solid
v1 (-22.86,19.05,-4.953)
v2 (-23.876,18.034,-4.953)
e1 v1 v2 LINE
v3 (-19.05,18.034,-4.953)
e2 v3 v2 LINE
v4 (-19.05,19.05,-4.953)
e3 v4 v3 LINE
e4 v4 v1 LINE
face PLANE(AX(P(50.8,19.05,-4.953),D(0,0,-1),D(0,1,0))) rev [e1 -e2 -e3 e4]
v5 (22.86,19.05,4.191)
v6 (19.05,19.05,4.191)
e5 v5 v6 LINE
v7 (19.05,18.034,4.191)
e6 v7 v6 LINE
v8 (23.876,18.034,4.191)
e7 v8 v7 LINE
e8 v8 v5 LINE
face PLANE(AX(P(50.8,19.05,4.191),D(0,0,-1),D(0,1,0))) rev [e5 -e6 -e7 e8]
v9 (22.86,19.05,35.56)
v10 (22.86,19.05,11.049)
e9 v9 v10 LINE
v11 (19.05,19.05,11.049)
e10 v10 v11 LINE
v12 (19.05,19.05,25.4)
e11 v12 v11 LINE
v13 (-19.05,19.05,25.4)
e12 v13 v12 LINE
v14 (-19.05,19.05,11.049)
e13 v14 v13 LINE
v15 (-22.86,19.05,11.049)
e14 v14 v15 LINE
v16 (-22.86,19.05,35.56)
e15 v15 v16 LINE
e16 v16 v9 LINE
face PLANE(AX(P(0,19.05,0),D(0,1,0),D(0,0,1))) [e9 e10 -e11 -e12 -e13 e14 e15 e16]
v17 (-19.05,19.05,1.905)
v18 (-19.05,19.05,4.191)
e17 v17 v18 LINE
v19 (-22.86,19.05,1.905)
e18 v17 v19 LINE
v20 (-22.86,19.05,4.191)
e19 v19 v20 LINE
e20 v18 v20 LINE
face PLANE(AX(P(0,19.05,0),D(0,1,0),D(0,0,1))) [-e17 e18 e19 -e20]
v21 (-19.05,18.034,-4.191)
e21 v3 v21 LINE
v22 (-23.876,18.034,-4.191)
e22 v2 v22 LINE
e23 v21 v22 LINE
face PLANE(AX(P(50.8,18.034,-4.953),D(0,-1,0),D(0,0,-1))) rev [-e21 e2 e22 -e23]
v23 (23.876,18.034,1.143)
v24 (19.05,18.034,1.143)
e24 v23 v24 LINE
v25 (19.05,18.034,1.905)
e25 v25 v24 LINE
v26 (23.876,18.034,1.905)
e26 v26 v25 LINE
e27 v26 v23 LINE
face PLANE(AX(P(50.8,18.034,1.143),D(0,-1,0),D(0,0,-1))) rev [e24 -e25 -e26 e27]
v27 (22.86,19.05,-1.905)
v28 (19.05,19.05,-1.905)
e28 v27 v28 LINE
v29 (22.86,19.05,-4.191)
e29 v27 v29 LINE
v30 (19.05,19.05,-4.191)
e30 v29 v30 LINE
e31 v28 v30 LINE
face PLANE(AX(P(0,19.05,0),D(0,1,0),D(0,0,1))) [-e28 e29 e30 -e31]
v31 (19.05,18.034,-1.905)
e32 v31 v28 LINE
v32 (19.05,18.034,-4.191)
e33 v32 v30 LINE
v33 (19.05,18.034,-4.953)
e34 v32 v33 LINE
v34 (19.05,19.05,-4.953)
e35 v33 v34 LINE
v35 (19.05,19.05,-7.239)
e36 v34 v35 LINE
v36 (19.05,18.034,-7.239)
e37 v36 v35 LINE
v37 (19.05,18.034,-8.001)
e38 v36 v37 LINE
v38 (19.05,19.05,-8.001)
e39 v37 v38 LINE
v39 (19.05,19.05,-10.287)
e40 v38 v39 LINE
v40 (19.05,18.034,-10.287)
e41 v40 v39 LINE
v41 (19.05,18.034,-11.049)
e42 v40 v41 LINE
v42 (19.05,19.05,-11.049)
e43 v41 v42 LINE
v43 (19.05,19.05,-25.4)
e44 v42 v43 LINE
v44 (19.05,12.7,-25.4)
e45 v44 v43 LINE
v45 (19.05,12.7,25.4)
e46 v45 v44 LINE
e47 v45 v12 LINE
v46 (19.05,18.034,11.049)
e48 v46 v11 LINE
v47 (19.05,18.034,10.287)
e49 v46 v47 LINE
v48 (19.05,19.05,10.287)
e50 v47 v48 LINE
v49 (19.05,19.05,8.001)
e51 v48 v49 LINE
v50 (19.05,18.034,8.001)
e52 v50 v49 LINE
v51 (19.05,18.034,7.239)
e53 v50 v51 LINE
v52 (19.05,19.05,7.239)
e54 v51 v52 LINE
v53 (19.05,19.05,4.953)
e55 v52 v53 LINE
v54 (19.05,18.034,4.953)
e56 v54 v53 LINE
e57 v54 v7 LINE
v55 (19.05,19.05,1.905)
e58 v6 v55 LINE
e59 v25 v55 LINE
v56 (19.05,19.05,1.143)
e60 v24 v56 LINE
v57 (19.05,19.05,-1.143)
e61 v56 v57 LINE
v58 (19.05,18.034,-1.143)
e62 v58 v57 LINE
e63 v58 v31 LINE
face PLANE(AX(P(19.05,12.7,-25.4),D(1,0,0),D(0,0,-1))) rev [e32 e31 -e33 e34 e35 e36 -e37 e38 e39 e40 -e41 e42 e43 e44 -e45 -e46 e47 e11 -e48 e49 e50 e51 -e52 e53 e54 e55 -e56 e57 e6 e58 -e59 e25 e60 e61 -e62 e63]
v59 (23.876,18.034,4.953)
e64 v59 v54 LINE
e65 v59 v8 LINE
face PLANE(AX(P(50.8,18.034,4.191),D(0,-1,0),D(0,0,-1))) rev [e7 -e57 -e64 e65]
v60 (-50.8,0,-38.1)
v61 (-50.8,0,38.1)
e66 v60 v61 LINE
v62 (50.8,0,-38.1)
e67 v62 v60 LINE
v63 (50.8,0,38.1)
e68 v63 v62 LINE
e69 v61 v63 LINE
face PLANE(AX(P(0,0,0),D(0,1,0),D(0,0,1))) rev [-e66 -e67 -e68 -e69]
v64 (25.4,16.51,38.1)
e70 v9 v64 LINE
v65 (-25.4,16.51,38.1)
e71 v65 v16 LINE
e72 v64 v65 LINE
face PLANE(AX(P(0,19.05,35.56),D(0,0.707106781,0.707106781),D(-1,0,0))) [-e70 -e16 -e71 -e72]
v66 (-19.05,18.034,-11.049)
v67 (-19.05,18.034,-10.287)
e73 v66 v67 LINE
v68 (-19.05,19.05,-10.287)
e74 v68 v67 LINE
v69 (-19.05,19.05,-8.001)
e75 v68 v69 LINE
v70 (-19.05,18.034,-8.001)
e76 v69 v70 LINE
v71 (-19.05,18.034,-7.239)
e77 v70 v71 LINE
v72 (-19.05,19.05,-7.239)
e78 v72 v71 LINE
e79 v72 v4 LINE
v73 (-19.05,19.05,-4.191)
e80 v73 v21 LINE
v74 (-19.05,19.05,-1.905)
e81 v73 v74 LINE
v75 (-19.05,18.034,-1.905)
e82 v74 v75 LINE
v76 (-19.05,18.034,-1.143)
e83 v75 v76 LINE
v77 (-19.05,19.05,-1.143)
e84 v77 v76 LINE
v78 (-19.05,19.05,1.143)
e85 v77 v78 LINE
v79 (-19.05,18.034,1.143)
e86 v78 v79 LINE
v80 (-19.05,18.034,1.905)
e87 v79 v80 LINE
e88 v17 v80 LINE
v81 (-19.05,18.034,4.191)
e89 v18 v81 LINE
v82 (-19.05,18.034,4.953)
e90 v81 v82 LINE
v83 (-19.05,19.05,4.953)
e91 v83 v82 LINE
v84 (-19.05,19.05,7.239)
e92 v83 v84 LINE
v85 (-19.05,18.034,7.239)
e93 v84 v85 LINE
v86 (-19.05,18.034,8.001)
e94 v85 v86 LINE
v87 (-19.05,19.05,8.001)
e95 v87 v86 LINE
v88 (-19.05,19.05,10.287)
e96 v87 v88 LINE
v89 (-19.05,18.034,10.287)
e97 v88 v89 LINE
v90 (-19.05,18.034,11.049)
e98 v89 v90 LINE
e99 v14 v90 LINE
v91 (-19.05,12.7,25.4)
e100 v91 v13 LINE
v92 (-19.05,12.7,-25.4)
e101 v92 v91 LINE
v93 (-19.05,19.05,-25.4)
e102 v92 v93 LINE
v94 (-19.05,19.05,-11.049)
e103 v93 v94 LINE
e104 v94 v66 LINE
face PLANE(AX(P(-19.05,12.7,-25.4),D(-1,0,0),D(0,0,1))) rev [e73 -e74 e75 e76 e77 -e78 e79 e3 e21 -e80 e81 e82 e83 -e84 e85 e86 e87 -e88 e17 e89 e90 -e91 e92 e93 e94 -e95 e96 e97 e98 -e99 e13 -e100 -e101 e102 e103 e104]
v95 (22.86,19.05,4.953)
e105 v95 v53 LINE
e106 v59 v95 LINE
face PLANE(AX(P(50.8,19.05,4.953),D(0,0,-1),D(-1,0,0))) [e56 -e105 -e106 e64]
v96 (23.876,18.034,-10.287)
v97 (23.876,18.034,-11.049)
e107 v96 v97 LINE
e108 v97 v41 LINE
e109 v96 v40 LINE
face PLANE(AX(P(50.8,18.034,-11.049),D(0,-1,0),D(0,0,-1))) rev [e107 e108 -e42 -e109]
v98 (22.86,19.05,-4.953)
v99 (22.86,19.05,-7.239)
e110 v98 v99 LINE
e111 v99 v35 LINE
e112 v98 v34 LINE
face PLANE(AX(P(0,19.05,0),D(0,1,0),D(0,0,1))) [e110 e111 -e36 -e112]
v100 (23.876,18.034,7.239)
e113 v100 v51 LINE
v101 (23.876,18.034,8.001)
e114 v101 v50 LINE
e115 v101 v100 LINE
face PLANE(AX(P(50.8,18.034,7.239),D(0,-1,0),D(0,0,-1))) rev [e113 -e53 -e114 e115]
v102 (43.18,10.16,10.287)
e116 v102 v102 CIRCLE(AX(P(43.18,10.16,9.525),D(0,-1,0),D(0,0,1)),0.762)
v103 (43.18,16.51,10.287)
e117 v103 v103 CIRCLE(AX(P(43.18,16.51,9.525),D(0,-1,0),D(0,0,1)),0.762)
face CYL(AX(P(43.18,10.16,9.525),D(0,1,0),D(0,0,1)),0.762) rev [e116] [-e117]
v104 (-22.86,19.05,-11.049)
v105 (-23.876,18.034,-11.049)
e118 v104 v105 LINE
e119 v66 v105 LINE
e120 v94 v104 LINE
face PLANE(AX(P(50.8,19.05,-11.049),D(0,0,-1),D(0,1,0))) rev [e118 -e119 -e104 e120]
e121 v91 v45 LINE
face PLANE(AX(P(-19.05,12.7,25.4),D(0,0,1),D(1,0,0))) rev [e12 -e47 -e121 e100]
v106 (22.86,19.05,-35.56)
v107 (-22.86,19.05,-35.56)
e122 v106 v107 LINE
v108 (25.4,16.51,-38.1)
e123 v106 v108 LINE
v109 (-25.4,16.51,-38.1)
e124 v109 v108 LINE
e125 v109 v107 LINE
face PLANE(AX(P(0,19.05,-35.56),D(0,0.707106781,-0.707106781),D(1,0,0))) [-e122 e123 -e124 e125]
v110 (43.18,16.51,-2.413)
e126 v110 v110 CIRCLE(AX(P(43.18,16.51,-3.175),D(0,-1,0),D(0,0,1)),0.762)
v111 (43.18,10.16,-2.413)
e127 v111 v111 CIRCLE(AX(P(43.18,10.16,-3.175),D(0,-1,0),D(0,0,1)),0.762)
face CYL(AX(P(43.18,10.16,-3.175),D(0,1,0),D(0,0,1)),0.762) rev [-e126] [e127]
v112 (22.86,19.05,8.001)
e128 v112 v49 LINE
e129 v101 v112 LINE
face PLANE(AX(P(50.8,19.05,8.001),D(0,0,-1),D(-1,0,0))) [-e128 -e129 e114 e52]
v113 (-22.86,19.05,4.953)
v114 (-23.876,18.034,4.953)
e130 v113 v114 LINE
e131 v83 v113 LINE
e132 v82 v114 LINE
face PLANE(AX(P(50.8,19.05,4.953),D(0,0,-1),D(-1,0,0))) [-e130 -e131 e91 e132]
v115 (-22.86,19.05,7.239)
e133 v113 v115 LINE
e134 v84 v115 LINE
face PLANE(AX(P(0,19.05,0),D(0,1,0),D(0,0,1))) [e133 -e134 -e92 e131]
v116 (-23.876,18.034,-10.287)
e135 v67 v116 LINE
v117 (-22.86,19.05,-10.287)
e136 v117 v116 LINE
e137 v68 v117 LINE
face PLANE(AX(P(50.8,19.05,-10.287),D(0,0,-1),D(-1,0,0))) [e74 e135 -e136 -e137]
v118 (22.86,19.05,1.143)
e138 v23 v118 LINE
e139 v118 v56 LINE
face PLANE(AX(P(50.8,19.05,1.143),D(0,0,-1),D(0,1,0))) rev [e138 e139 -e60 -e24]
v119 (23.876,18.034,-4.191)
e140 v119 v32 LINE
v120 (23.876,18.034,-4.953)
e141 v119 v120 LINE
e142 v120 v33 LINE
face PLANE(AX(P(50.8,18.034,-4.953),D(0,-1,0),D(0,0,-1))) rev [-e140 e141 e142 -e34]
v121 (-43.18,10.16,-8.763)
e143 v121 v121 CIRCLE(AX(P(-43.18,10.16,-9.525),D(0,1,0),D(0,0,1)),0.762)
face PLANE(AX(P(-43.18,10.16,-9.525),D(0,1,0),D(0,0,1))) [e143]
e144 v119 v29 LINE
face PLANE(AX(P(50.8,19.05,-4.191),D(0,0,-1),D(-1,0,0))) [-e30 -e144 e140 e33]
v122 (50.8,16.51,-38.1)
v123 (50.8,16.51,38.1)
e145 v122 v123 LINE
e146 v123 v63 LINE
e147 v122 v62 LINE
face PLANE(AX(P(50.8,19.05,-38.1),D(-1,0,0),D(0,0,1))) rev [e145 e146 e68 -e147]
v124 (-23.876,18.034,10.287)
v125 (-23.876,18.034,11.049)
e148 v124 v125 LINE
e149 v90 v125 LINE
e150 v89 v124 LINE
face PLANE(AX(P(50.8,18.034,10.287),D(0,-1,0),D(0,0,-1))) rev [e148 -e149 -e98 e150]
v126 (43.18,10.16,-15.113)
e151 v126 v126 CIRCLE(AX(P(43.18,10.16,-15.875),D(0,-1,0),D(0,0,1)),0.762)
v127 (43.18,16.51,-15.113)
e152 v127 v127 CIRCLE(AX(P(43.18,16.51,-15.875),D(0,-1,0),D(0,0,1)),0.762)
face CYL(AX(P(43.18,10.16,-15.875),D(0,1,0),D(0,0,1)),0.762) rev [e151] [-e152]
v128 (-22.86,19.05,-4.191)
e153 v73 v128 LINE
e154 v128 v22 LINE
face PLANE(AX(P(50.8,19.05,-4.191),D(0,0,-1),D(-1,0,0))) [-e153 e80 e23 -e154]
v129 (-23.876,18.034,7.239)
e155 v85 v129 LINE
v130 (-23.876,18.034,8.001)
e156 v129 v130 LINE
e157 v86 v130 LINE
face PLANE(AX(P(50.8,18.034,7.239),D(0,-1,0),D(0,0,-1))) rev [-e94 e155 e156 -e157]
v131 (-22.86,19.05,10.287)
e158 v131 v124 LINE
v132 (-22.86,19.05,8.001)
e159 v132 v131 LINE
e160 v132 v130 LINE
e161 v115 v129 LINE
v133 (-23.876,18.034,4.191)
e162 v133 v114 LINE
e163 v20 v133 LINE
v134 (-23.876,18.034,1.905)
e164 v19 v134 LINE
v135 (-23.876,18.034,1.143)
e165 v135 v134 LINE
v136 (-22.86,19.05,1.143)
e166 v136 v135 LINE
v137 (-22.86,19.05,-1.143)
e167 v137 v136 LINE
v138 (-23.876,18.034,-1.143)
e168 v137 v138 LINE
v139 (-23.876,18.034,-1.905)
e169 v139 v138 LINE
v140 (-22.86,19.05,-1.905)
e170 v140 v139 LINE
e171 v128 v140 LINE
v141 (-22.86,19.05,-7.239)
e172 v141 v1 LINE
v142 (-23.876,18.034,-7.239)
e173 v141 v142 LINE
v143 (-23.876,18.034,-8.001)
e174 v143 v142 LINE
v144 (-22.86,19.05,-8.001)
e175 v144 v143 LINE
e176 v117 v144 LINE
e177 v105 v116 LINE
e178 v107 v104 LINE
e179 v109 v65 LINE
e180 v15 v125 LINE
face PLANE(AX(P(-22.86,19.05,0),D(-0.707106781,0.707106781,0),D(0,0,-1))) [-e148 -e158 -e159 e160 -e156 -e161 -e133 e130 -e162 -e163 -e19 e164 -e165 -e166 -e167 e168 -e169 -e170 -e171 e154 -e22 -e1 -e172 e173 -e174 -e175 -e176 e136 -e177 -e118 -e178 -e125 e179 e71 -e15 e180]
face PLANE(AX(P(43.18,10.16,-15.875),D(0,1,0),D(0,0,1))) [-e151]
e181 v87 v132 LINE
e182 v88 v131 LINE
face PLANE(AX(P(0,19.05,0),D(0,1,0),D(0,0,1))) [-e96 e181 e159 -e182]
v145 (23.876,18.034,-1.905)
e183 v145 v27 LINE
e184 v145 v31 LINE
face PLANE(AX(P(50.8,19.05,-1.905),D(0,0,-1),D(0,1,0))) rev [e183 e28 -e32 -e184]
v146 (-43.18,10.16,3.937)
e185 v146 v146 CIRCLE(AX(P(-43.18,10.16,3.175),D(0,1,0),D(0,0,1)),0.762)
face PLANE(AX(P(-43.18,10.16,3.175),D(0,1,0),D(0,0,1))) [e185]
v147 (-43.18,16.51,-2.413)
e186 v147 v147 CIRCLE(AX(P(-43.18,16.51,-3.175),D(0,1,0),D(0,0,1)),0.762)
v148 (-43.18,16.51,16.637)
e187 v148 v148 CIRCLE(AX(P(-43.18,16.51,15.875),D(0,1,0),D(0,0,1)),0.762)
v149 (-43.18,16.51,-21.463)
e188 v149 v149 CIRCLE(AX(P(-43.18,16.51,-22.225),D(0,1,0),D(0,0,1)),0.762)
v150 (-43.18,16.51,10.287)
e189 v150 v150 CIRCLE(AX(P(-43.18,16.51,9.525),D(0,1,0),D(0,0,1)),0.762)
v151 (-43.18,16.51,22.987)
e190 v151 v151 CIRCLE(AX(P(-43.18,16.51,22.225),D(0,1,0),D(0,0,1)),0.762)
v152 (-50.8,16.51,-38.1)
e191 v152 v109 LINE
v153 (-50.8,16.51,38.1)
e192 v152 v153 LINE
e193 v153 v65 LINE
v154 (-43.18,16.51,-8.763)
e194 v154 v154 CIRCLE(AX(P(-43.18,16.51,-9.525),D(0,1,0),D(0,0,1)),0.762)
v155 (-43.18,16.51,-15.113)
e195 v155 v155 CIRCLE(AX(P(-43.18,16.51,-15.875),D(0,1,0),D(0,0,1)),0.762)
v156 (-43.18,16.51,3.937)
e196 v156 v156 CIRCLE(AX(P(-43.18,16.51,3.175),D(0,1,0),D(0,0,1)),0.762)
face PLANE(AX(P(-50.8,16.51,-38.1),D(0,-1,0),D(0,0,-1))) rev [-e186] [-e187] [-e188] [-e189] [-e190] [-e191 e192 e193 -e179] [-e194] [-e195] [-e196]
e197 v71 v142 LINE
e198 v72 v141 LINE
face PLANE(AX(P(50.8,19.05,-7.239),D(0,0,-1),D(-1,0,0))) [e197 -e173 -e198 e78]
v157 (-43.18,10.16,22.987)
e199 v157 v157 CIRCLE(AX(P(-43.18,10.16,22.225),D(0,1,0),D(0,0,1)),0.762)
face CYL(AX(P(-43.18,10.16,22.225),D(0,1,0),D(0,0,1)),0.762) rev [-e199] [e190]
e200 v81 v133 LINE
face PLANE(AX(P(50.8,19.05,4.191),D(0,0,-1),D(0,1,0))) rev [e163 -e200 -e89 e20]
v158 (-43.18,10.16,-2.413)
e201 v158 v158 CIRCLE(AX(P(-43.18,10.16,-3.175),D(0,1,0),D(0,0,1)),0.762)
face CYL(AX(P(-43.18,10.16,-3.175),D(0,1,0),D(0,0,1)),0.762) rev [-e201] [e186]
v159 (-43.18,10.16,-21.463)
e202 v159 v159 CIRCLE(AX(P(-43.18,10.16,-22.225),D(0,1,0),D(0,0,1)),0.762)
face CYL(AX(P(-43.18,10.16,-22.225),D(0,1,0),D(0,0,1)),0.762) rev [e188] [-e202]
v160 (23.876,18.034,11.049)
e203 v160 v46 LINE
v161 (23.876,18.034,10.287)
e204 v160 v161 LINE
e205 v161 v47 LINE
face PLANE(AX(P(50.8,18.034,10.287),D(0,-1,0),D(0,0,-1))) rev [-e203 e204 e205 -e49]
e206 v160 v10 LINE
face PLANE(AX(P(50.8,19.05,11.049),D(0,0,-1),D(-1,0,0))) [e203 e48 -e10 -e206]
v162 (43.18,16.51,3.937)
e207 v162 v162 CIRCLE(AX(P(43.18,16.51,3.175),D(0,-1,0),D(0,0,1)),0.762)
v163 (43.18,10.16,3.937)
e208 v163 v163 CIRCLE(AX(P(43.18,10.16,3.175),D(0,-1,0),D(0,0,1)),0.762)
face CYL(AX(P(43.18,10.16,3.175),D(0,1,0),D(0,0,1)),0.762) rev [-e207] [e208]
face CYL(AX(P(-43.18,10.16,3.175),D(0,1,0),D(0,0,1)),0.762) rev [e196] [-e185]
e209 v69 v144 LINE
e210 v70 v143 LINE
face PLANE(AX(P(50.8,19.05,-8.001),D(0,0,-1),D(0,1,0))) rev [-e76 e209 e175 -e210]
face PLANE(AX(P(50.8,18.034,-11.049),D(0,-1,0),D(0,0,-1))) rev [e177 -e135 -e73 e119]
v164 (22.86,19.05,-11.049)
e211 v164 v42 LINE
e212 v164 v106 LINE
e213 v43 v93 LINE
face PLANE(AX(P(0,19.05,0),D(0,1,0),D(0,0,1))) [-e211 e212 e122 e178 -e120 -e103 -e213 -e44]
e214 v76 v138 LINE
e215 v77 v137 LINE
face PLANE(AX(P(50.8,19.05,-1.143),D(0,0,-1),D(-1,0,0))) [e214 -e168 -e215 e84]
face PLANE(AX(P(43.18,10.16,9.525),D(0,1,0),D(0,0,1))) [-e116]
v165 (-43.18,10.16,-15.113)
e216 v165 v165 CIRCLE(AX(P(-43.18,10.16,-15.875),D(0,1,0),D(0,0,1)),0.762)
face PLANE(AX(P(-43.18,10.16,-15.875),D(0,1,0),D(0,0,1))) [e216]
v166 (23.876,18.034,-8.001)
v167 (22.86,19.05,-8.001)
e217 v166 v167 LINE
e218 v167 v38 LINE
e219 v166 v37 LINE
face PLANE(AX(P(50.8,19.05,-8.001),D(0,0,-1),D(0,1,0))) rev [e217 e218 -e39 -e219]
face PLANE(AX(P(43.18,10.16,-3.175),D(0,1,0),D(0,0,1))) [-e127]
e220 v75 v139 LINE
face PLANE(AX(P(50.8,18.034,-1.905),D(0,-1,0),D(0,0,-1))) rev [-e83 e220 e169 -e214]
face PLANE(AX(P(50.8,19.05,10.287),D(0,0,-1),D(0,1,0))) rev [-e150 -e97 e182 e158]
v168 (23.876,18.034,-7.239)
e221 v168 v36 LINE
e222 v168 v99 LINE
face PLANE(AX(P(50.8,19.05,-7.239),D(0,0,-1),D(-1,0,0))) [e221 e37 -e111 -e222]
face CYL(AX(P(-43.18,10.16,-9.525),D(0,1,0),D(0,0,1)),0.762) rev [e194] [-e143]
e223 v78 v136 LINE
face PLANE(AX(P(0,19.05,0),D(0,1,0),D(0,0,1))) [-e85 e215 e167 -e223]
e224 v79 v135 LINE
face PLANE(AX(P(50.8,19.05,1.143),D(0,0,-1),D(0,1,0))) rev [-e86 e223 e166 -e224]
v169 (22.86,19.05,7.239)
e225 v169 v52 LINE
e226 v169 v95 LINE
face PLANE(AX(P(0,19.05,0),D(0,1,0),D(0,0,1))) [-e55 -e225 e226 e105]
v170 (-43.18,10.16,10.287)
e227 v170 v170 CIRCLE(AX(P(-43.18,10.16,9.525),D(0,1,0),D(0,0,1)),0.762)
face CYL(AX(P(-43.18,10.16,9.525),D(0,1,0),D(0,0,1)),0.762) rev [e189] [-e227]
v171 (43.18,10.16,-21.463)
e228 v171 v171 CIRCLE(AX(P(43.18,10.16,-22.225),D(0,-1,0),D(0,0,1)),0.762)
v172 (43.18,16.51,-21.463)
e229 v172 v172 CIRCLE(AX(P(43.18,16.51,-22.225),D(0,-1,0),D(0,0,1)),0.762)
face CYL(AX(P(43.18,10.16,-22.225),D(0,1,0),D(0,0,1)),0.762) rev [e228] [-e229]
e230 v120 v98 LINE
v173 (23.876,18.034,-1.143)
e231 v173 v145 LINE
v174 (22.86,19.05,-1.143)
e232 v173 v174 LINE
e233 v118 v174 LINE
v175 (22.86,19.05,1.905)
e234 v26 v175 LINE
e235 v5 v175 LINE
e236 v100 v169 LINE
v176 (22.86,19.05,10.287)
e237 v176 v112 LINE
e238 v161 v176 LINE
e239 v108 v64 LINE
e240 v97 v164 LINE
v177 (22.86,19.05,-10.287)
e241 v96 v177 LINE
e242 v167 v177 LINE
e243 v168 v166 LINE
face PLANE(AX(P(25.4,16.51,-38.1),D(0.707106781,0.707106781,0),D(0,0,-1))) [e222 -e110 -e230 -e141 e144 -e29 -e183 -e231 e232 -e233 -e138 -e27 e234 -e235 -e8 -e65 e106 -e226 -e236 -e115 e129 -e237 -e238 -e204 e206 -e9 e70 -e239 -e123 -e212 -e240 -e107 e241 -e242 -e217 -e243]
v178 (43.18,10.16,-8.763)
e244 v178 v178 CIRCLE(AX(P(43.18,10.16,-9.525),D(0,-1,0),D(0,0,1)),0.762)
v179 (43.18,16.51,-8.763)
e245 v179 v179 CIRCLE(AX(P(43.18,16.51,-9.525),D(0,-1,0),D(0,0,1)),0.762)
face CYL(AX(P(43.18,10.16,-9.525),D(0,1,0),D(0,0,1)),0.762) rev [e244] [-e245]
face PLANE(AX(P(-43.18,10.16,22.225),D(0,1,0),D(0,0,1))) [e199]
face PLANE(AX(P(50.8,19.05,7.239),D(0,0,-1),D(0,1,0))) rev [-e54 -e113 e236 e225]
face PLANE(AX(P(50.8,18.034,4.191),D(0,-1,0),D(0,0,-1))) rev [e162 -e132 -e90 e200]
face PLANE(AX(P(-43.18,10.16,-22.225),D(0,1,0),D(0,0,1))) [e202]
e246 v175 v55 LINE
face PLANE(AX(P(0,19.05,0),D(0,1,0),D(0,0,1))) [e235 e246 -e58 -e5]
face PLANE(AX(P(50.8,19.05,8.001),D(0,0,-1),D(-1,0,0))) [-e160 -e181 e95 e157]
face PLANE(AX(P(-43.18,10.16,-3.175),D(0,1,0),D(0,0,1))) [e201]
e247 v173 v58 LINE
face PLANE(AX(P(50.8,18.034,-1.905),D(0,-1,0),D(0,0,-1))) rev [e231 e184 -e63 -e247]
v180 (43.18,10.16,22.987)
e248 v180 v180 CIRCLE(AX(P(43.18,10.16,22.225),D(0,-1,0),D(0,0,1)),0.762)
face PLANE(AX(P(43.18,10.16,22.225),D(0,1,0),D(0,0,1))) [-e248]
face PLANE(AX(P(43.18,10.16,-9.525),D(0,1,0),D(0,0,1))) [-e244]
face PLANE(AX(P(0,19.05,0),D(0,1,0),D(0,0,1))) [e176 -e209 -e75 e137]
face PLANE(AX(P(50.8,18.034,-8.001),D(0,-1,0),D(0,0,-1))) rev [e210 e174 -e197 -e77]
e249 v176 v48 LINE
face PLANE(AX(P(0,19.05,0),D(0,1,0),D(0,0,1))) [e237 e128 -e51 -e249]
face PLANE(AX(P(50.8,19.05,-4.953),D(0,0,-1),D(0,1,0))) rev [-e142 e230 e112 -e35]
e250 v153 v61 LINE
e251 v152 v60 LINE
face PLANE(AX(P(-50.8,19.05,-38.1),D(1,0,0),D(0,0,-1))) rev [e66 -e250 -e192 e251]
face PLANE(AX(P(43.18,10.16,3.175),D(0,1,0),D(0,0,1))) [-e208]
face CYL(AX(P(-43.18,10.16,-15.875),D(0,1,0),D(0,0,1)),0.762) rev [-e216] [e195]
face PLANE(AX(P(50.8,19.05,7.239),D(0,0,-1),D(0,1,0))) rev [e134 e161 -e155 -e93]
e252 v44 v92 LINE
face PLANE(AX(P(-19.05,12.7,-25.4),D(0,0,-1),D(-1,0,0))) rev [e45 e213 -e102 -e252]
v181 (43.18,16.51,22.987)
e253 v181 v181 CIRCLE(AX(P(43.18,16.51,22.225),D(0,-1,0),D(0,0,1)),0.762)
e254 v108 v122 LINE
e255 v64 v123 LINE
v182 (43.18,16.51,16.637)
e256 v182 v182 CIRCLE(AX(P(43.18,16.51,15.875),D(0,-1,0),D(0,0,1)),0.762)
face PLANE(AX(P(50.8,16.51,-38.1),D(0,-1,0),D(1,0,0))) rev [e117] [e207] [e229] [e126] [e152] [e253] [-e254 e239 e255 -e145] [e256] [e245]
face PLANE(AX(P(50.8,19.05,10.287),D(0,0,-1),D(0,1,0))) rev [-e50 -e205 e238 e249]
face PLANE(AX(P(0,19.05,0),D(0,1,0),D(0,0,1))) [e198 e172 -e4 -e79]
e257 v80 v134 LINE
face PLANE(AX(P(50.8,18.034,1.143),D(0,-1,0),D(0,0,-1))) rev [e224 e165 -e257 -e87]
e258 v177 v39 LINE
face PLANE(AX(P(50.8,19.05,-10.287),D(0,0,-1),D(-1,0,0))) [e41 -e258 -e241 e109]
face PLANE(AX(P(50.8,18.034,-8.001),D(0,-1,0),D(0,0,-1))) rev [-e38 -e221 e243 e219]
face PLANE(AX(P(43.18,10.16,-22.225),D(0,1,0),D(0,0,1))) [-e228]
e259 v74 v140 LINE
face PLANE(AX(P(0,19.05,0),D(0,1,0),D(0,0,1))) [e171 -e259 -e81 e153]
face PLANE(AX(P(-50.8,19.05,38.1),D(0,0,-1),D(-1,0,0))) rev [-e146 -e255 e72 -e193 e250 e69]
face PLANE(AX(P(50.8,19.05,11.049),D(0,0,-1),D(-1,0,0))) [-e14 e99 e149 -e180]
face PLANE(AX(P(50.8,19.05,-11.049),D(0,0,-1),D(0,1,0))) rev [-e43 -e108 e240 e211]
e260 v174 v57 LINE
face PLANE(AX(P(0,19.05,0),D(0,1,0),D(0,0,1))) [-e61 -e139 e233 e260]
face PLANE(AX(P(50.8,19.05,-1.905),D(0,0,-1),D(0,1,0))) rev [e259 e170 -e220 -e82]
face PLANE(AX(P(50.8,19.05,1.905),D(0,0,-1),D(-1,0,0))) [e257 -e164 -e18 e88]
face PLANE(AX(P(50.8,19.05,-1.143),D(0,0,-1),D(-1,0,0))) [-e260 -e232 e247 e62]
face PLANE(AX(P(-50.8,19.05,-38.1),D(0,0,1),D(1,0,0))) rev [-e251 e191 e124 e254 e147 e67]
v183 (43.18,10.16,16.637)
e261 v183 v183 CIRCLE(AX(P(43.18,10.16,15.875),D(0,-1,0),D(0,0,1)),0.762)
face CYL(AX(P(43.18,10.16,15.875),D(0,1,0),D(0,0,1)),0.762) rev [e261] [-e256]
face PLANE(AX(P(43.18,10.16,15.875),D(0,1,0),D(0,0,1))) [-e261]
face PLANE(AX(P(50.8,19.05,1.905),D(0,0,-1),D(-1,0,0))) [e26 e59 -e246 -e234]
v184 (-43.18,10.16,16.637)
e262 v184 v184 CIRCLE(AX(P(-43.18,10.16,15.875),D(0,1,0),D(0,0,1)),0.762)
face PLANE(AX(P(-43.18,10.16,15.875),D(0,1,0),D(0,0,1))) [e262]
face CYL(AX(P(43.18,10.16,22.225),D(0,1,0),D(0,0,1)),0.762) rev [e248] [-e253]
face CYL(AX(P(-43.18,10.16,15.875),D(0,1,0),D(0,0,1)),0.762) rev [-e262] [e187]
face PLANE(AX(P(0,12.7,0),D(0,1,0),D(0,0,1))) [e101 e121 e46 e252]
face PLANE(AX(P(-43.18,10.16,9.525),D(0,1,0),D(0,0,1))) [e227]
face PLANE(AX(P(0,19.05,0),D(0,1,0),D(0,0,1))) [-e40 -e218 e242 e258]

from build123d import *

# Parameters (mm, degrees)
SKETCH1_W               = 101.6
SKETCH1_H               = 76.2
BOSS_EXTRUDE1_DEPTH     = 19.05
SKETCH2_W               = 38.1
SKETCH2_H               = 50.8
CUT_EXTRUDE1_DEPTH      = 6.35
SKETCH3_W               = 25.4
SKETCH3_H               = 2.54
CUT_EXTRUDE2_DEPTH      = 94.541341128
CHAMFER1_SIZE           = 2.54
SKETCH4_R               = 0.762
CUT_EXTRUDE3_DEPTH      = 6.35
LPATTERN1_COUNT         = 8
LPATTERN1_PITCH         = 6.35
MIRROR1_COPY_1_SKETCH_R = 0.762
MIRROR1_COPY_1_DEPTH    = 6.35
MIRROR1_COPY_2_SKETCH_R = 0.762
MIRROR1_COPY_2_DEPTH    = 6.35
MIRROR1_COPY_3_SKETCH_R = 0.762
MIRROR1_COPY_3_DEPTH    = 6.35
MIRROR1_COPY_4_SKETCH_R = 0.762
MIRROR1_COPY_4_DEPTH    = 6.35
MIRROR1_COPY_5_SKETCH_R = 0.762
MIRROR1_COPY_5_DEPTH    = 6.35
MIRROR1_COPY_6_SKETCH_R = 0.762
MIRROR1_COPY_6_DEPTH    = 6.35
MIRROR1_COPY_7_SKETCH_R = 0.762
MIRROR1_COPY_7_DEPTH    = 6.35
SKETCH6_W               = 0.762
SKETCH6_H               = 1.016
CUT_EXTRUDE8_DEPTH      = 111.168382488
LPATTERN2_COUNT         = 8
LPATTERN2_PITCH         = 3.048


with BuildPart() as part:
    # Sketch1 → Boss-Extrude1 (new body)
    with BuildSketch(Plane(origin=(0, 0, 0), x_dir=(1, 0, 0), z_dir=(0, 1, 0))):
        Rectangle(SKETCH1_W, SKETCH1_H)
    extrude(amount=BOSS_EXTRUDE1_DEPTH)

    # Sketch2 → Cut-Extrude1 (cut)
    with BuildSketch(Plane(origin=(0, 19.05, 0), x_dir=(1, 0, 0), z_dir=(0, 1, 0))):
        Rectangle(SKETCH2_W, SKETCH2_H)
    extrude(amount=-CUT_EXTRUDE1_DEPTH, mode=Mode.SUBTRACT)

    # Sketch3 → Cut-Extrude2 (cut, through all)
    with BuildSketch(Plane.XY.offset(38.1)):
        with Locations((-38.1, 17.78)):
            Rectangle(SKETCH3_W, SKETCH3_H)
        with Locations((38.1, 17.78)):
            Rectangle(SKETCH3_W, SKETCH3_H)
    extrude(amount=-CUT_EXTRUDE2_DEPTH, mode=Mode.SUBTRACT)

    # Chamfer1
    chamfer1_edges = [part.edges().sort_by_distance(p)[0] for p in [
        (25.4, 19.05, 0),
        (-25.4, 19.05, 0),
        (0, 19.05, -38.1),
        (0, 19.05, 38.1),
    ]]
    chamfer(chamfer1_edges, length=CHAMFER1_SIZE - 0.0001)  # a hair under: the kernel refuses the full size

    # Sketch4 → Cut-Extrude3 (cut)
    with BuildSketch(Plane(origin=(0, 16.51, 0), x_dir=(1, 0, 0), z_dir=(0, 1, 0))):
        with Locations(Location((-43.18, 22.225, 0), (0, 0, 270))):
            Circle(SKETCH4_R)
    cut_extrude3 = extrude(amount=-CUT_EXTRUDE3_DEPTH, mode=Mode.SUBTRACT)

    # LPattern1: Cut-Extrude3 ×8
    with Locations(*[(0, 0, i * LPATTERN1_PITCH) for i in range(1, LPATTERN1_COUNT)]):
        add(cut_extrude3, mode=Mode.SUBTRACT)

    # Mirror1: Cut-Extrude3 across plane
    add(cut_extrude3.mirror(Plane(origin=(0, 0, 0), x_dir=(0, 0, 1), z_dir=(1, 0, 0))), mode=Mode.SUBTRACT)

    # Mirror1 copy 1 sketch → Mirror1 copy 1 (cut)
    with BuildSketch(Plane(origin=(0, 16.51, 6.35), x_dir=(-1, 0, 0), z_dir=(0, 1, 0))):
        with Locations((-43.18, -22.225)):
            Circle(MIRROR1_COPY_1_SKETCH_R)
    extrude(amount=-MIRROR1_COPY_1_DEPTH, mode=Mode.SUBTRACT)

    # Mirror1 copy 2 sketch → Mirror1 copy 2 (cut)
    with BuildSketch(Plane(origin=(0, 16.51, 12.7), x_dir=(-1, 0, 0), z_dir=(0, 1, 0))):
        with Locations((-43.18, -22.225)):
            Circle(MIRROR1_COPY_2_SKETCH_R)
    extrude(amount=-MIRROR1_COPY_2_DEPTH, mode=Mode.SUBTRACT)

    # Mirror1 copy 3 sketch → Mirror1 copy 3 (cut)
    with BuildSketch(Plane(origin=(0, 16.51, 19.05), x_dir=(-1, 0, 0), z_dir=(0, 1, 0))):
        with Locations((-43.18, -22.225)):
            Circle(MIRROR1_COPY_3_SKETCH_R)
    extrude(amount=-MIRROR1_COPY_3_DEPTH, mode=Mode.SUBTRACT)

    # Mirror1 copy 4 sketch → Mirror1 copy 4 (cut)
    with BuildSketch(Plane(origin=(0, 16.51, 25.4), x_dir=(-1, 0, 0), z_dir=(0, 1, 0))):
        with Locations((-43.18, -22.225)):
            Circle(MIRROR1_COPY_4_SKETCH_R)
    extrude(amount=-MIRROR1_COPY_4_DEPTH, mode=Mode.SUBTRACT)

    # Mirror1 copy 5 sketch → Mirror1 copy 5 (cut)
    with BuildSketch(Plane(origin=(0, 16.51, 31.75), x_dir=(-1, 0, 0), z_dir=(0, 1, 0))):
        with Locations((-43.18, -22.225)):
            Circle(MIRROR1_COPY_5_SKETCH_R)
    extrude(amount=-MIRROR1_COPY_5_DEPTH, mode=Mode.SUBTRACT)

    # Mirror1 copy 6 sketch → Mirror1 copy 6 (cut)
    with BuildSketch(Plane(origin=(0, 16.51, 38.1), x_dir=(-1, 0, 0), z_dir=(0, 1, 0))):
        with Locations((-43.18, -22.225)):
            Circle(MIRROR1_COPY_6_SKETCH_R)
    extrude(amount=-MIRROR1_COPY_6_DEPTH, mode=Mode.SUBTRACT)

    # Mirror1 copy 7 sketch → Mirror1 copy 7 (cut)
    with BuildSketch(Plane(origin=(0, 16.51, 44.45), x_dir=(-1, 0, 0), z_dir=(0, 1, 0))):
        with Locations((-43.18, -22.225)):
            Circle(MIRROR1_COPY_7_SKETCH_R)
    extrude(amount=-MIRROR1_COPY_7_DEPTH, mode=Mode.SUBTRACT)

    # Sketch6 → Cut-Extrude8 (cut, through all)
    with BuildSketch(Plane.ZY.offset(50.8)):
        with Locations((-10.668, 18.542)):
            Rectangle(SKETCH6_W, SKETCH6_H)
    cut_extrude8 = extrude(amount=-CUT_EXTRUDE8_DEPTH, mode=Mode.SUBTRACT)

    # LPattern2: Cut-Extrude8 ×8
    with Locations(*[(0, 0, i * LPATTERN2_PITCH) for i in range(1, LPATTERN2_COUNT)]):
        add(cut_extrude8, mode=Mode.SUBTRACT)


solid = part.part
